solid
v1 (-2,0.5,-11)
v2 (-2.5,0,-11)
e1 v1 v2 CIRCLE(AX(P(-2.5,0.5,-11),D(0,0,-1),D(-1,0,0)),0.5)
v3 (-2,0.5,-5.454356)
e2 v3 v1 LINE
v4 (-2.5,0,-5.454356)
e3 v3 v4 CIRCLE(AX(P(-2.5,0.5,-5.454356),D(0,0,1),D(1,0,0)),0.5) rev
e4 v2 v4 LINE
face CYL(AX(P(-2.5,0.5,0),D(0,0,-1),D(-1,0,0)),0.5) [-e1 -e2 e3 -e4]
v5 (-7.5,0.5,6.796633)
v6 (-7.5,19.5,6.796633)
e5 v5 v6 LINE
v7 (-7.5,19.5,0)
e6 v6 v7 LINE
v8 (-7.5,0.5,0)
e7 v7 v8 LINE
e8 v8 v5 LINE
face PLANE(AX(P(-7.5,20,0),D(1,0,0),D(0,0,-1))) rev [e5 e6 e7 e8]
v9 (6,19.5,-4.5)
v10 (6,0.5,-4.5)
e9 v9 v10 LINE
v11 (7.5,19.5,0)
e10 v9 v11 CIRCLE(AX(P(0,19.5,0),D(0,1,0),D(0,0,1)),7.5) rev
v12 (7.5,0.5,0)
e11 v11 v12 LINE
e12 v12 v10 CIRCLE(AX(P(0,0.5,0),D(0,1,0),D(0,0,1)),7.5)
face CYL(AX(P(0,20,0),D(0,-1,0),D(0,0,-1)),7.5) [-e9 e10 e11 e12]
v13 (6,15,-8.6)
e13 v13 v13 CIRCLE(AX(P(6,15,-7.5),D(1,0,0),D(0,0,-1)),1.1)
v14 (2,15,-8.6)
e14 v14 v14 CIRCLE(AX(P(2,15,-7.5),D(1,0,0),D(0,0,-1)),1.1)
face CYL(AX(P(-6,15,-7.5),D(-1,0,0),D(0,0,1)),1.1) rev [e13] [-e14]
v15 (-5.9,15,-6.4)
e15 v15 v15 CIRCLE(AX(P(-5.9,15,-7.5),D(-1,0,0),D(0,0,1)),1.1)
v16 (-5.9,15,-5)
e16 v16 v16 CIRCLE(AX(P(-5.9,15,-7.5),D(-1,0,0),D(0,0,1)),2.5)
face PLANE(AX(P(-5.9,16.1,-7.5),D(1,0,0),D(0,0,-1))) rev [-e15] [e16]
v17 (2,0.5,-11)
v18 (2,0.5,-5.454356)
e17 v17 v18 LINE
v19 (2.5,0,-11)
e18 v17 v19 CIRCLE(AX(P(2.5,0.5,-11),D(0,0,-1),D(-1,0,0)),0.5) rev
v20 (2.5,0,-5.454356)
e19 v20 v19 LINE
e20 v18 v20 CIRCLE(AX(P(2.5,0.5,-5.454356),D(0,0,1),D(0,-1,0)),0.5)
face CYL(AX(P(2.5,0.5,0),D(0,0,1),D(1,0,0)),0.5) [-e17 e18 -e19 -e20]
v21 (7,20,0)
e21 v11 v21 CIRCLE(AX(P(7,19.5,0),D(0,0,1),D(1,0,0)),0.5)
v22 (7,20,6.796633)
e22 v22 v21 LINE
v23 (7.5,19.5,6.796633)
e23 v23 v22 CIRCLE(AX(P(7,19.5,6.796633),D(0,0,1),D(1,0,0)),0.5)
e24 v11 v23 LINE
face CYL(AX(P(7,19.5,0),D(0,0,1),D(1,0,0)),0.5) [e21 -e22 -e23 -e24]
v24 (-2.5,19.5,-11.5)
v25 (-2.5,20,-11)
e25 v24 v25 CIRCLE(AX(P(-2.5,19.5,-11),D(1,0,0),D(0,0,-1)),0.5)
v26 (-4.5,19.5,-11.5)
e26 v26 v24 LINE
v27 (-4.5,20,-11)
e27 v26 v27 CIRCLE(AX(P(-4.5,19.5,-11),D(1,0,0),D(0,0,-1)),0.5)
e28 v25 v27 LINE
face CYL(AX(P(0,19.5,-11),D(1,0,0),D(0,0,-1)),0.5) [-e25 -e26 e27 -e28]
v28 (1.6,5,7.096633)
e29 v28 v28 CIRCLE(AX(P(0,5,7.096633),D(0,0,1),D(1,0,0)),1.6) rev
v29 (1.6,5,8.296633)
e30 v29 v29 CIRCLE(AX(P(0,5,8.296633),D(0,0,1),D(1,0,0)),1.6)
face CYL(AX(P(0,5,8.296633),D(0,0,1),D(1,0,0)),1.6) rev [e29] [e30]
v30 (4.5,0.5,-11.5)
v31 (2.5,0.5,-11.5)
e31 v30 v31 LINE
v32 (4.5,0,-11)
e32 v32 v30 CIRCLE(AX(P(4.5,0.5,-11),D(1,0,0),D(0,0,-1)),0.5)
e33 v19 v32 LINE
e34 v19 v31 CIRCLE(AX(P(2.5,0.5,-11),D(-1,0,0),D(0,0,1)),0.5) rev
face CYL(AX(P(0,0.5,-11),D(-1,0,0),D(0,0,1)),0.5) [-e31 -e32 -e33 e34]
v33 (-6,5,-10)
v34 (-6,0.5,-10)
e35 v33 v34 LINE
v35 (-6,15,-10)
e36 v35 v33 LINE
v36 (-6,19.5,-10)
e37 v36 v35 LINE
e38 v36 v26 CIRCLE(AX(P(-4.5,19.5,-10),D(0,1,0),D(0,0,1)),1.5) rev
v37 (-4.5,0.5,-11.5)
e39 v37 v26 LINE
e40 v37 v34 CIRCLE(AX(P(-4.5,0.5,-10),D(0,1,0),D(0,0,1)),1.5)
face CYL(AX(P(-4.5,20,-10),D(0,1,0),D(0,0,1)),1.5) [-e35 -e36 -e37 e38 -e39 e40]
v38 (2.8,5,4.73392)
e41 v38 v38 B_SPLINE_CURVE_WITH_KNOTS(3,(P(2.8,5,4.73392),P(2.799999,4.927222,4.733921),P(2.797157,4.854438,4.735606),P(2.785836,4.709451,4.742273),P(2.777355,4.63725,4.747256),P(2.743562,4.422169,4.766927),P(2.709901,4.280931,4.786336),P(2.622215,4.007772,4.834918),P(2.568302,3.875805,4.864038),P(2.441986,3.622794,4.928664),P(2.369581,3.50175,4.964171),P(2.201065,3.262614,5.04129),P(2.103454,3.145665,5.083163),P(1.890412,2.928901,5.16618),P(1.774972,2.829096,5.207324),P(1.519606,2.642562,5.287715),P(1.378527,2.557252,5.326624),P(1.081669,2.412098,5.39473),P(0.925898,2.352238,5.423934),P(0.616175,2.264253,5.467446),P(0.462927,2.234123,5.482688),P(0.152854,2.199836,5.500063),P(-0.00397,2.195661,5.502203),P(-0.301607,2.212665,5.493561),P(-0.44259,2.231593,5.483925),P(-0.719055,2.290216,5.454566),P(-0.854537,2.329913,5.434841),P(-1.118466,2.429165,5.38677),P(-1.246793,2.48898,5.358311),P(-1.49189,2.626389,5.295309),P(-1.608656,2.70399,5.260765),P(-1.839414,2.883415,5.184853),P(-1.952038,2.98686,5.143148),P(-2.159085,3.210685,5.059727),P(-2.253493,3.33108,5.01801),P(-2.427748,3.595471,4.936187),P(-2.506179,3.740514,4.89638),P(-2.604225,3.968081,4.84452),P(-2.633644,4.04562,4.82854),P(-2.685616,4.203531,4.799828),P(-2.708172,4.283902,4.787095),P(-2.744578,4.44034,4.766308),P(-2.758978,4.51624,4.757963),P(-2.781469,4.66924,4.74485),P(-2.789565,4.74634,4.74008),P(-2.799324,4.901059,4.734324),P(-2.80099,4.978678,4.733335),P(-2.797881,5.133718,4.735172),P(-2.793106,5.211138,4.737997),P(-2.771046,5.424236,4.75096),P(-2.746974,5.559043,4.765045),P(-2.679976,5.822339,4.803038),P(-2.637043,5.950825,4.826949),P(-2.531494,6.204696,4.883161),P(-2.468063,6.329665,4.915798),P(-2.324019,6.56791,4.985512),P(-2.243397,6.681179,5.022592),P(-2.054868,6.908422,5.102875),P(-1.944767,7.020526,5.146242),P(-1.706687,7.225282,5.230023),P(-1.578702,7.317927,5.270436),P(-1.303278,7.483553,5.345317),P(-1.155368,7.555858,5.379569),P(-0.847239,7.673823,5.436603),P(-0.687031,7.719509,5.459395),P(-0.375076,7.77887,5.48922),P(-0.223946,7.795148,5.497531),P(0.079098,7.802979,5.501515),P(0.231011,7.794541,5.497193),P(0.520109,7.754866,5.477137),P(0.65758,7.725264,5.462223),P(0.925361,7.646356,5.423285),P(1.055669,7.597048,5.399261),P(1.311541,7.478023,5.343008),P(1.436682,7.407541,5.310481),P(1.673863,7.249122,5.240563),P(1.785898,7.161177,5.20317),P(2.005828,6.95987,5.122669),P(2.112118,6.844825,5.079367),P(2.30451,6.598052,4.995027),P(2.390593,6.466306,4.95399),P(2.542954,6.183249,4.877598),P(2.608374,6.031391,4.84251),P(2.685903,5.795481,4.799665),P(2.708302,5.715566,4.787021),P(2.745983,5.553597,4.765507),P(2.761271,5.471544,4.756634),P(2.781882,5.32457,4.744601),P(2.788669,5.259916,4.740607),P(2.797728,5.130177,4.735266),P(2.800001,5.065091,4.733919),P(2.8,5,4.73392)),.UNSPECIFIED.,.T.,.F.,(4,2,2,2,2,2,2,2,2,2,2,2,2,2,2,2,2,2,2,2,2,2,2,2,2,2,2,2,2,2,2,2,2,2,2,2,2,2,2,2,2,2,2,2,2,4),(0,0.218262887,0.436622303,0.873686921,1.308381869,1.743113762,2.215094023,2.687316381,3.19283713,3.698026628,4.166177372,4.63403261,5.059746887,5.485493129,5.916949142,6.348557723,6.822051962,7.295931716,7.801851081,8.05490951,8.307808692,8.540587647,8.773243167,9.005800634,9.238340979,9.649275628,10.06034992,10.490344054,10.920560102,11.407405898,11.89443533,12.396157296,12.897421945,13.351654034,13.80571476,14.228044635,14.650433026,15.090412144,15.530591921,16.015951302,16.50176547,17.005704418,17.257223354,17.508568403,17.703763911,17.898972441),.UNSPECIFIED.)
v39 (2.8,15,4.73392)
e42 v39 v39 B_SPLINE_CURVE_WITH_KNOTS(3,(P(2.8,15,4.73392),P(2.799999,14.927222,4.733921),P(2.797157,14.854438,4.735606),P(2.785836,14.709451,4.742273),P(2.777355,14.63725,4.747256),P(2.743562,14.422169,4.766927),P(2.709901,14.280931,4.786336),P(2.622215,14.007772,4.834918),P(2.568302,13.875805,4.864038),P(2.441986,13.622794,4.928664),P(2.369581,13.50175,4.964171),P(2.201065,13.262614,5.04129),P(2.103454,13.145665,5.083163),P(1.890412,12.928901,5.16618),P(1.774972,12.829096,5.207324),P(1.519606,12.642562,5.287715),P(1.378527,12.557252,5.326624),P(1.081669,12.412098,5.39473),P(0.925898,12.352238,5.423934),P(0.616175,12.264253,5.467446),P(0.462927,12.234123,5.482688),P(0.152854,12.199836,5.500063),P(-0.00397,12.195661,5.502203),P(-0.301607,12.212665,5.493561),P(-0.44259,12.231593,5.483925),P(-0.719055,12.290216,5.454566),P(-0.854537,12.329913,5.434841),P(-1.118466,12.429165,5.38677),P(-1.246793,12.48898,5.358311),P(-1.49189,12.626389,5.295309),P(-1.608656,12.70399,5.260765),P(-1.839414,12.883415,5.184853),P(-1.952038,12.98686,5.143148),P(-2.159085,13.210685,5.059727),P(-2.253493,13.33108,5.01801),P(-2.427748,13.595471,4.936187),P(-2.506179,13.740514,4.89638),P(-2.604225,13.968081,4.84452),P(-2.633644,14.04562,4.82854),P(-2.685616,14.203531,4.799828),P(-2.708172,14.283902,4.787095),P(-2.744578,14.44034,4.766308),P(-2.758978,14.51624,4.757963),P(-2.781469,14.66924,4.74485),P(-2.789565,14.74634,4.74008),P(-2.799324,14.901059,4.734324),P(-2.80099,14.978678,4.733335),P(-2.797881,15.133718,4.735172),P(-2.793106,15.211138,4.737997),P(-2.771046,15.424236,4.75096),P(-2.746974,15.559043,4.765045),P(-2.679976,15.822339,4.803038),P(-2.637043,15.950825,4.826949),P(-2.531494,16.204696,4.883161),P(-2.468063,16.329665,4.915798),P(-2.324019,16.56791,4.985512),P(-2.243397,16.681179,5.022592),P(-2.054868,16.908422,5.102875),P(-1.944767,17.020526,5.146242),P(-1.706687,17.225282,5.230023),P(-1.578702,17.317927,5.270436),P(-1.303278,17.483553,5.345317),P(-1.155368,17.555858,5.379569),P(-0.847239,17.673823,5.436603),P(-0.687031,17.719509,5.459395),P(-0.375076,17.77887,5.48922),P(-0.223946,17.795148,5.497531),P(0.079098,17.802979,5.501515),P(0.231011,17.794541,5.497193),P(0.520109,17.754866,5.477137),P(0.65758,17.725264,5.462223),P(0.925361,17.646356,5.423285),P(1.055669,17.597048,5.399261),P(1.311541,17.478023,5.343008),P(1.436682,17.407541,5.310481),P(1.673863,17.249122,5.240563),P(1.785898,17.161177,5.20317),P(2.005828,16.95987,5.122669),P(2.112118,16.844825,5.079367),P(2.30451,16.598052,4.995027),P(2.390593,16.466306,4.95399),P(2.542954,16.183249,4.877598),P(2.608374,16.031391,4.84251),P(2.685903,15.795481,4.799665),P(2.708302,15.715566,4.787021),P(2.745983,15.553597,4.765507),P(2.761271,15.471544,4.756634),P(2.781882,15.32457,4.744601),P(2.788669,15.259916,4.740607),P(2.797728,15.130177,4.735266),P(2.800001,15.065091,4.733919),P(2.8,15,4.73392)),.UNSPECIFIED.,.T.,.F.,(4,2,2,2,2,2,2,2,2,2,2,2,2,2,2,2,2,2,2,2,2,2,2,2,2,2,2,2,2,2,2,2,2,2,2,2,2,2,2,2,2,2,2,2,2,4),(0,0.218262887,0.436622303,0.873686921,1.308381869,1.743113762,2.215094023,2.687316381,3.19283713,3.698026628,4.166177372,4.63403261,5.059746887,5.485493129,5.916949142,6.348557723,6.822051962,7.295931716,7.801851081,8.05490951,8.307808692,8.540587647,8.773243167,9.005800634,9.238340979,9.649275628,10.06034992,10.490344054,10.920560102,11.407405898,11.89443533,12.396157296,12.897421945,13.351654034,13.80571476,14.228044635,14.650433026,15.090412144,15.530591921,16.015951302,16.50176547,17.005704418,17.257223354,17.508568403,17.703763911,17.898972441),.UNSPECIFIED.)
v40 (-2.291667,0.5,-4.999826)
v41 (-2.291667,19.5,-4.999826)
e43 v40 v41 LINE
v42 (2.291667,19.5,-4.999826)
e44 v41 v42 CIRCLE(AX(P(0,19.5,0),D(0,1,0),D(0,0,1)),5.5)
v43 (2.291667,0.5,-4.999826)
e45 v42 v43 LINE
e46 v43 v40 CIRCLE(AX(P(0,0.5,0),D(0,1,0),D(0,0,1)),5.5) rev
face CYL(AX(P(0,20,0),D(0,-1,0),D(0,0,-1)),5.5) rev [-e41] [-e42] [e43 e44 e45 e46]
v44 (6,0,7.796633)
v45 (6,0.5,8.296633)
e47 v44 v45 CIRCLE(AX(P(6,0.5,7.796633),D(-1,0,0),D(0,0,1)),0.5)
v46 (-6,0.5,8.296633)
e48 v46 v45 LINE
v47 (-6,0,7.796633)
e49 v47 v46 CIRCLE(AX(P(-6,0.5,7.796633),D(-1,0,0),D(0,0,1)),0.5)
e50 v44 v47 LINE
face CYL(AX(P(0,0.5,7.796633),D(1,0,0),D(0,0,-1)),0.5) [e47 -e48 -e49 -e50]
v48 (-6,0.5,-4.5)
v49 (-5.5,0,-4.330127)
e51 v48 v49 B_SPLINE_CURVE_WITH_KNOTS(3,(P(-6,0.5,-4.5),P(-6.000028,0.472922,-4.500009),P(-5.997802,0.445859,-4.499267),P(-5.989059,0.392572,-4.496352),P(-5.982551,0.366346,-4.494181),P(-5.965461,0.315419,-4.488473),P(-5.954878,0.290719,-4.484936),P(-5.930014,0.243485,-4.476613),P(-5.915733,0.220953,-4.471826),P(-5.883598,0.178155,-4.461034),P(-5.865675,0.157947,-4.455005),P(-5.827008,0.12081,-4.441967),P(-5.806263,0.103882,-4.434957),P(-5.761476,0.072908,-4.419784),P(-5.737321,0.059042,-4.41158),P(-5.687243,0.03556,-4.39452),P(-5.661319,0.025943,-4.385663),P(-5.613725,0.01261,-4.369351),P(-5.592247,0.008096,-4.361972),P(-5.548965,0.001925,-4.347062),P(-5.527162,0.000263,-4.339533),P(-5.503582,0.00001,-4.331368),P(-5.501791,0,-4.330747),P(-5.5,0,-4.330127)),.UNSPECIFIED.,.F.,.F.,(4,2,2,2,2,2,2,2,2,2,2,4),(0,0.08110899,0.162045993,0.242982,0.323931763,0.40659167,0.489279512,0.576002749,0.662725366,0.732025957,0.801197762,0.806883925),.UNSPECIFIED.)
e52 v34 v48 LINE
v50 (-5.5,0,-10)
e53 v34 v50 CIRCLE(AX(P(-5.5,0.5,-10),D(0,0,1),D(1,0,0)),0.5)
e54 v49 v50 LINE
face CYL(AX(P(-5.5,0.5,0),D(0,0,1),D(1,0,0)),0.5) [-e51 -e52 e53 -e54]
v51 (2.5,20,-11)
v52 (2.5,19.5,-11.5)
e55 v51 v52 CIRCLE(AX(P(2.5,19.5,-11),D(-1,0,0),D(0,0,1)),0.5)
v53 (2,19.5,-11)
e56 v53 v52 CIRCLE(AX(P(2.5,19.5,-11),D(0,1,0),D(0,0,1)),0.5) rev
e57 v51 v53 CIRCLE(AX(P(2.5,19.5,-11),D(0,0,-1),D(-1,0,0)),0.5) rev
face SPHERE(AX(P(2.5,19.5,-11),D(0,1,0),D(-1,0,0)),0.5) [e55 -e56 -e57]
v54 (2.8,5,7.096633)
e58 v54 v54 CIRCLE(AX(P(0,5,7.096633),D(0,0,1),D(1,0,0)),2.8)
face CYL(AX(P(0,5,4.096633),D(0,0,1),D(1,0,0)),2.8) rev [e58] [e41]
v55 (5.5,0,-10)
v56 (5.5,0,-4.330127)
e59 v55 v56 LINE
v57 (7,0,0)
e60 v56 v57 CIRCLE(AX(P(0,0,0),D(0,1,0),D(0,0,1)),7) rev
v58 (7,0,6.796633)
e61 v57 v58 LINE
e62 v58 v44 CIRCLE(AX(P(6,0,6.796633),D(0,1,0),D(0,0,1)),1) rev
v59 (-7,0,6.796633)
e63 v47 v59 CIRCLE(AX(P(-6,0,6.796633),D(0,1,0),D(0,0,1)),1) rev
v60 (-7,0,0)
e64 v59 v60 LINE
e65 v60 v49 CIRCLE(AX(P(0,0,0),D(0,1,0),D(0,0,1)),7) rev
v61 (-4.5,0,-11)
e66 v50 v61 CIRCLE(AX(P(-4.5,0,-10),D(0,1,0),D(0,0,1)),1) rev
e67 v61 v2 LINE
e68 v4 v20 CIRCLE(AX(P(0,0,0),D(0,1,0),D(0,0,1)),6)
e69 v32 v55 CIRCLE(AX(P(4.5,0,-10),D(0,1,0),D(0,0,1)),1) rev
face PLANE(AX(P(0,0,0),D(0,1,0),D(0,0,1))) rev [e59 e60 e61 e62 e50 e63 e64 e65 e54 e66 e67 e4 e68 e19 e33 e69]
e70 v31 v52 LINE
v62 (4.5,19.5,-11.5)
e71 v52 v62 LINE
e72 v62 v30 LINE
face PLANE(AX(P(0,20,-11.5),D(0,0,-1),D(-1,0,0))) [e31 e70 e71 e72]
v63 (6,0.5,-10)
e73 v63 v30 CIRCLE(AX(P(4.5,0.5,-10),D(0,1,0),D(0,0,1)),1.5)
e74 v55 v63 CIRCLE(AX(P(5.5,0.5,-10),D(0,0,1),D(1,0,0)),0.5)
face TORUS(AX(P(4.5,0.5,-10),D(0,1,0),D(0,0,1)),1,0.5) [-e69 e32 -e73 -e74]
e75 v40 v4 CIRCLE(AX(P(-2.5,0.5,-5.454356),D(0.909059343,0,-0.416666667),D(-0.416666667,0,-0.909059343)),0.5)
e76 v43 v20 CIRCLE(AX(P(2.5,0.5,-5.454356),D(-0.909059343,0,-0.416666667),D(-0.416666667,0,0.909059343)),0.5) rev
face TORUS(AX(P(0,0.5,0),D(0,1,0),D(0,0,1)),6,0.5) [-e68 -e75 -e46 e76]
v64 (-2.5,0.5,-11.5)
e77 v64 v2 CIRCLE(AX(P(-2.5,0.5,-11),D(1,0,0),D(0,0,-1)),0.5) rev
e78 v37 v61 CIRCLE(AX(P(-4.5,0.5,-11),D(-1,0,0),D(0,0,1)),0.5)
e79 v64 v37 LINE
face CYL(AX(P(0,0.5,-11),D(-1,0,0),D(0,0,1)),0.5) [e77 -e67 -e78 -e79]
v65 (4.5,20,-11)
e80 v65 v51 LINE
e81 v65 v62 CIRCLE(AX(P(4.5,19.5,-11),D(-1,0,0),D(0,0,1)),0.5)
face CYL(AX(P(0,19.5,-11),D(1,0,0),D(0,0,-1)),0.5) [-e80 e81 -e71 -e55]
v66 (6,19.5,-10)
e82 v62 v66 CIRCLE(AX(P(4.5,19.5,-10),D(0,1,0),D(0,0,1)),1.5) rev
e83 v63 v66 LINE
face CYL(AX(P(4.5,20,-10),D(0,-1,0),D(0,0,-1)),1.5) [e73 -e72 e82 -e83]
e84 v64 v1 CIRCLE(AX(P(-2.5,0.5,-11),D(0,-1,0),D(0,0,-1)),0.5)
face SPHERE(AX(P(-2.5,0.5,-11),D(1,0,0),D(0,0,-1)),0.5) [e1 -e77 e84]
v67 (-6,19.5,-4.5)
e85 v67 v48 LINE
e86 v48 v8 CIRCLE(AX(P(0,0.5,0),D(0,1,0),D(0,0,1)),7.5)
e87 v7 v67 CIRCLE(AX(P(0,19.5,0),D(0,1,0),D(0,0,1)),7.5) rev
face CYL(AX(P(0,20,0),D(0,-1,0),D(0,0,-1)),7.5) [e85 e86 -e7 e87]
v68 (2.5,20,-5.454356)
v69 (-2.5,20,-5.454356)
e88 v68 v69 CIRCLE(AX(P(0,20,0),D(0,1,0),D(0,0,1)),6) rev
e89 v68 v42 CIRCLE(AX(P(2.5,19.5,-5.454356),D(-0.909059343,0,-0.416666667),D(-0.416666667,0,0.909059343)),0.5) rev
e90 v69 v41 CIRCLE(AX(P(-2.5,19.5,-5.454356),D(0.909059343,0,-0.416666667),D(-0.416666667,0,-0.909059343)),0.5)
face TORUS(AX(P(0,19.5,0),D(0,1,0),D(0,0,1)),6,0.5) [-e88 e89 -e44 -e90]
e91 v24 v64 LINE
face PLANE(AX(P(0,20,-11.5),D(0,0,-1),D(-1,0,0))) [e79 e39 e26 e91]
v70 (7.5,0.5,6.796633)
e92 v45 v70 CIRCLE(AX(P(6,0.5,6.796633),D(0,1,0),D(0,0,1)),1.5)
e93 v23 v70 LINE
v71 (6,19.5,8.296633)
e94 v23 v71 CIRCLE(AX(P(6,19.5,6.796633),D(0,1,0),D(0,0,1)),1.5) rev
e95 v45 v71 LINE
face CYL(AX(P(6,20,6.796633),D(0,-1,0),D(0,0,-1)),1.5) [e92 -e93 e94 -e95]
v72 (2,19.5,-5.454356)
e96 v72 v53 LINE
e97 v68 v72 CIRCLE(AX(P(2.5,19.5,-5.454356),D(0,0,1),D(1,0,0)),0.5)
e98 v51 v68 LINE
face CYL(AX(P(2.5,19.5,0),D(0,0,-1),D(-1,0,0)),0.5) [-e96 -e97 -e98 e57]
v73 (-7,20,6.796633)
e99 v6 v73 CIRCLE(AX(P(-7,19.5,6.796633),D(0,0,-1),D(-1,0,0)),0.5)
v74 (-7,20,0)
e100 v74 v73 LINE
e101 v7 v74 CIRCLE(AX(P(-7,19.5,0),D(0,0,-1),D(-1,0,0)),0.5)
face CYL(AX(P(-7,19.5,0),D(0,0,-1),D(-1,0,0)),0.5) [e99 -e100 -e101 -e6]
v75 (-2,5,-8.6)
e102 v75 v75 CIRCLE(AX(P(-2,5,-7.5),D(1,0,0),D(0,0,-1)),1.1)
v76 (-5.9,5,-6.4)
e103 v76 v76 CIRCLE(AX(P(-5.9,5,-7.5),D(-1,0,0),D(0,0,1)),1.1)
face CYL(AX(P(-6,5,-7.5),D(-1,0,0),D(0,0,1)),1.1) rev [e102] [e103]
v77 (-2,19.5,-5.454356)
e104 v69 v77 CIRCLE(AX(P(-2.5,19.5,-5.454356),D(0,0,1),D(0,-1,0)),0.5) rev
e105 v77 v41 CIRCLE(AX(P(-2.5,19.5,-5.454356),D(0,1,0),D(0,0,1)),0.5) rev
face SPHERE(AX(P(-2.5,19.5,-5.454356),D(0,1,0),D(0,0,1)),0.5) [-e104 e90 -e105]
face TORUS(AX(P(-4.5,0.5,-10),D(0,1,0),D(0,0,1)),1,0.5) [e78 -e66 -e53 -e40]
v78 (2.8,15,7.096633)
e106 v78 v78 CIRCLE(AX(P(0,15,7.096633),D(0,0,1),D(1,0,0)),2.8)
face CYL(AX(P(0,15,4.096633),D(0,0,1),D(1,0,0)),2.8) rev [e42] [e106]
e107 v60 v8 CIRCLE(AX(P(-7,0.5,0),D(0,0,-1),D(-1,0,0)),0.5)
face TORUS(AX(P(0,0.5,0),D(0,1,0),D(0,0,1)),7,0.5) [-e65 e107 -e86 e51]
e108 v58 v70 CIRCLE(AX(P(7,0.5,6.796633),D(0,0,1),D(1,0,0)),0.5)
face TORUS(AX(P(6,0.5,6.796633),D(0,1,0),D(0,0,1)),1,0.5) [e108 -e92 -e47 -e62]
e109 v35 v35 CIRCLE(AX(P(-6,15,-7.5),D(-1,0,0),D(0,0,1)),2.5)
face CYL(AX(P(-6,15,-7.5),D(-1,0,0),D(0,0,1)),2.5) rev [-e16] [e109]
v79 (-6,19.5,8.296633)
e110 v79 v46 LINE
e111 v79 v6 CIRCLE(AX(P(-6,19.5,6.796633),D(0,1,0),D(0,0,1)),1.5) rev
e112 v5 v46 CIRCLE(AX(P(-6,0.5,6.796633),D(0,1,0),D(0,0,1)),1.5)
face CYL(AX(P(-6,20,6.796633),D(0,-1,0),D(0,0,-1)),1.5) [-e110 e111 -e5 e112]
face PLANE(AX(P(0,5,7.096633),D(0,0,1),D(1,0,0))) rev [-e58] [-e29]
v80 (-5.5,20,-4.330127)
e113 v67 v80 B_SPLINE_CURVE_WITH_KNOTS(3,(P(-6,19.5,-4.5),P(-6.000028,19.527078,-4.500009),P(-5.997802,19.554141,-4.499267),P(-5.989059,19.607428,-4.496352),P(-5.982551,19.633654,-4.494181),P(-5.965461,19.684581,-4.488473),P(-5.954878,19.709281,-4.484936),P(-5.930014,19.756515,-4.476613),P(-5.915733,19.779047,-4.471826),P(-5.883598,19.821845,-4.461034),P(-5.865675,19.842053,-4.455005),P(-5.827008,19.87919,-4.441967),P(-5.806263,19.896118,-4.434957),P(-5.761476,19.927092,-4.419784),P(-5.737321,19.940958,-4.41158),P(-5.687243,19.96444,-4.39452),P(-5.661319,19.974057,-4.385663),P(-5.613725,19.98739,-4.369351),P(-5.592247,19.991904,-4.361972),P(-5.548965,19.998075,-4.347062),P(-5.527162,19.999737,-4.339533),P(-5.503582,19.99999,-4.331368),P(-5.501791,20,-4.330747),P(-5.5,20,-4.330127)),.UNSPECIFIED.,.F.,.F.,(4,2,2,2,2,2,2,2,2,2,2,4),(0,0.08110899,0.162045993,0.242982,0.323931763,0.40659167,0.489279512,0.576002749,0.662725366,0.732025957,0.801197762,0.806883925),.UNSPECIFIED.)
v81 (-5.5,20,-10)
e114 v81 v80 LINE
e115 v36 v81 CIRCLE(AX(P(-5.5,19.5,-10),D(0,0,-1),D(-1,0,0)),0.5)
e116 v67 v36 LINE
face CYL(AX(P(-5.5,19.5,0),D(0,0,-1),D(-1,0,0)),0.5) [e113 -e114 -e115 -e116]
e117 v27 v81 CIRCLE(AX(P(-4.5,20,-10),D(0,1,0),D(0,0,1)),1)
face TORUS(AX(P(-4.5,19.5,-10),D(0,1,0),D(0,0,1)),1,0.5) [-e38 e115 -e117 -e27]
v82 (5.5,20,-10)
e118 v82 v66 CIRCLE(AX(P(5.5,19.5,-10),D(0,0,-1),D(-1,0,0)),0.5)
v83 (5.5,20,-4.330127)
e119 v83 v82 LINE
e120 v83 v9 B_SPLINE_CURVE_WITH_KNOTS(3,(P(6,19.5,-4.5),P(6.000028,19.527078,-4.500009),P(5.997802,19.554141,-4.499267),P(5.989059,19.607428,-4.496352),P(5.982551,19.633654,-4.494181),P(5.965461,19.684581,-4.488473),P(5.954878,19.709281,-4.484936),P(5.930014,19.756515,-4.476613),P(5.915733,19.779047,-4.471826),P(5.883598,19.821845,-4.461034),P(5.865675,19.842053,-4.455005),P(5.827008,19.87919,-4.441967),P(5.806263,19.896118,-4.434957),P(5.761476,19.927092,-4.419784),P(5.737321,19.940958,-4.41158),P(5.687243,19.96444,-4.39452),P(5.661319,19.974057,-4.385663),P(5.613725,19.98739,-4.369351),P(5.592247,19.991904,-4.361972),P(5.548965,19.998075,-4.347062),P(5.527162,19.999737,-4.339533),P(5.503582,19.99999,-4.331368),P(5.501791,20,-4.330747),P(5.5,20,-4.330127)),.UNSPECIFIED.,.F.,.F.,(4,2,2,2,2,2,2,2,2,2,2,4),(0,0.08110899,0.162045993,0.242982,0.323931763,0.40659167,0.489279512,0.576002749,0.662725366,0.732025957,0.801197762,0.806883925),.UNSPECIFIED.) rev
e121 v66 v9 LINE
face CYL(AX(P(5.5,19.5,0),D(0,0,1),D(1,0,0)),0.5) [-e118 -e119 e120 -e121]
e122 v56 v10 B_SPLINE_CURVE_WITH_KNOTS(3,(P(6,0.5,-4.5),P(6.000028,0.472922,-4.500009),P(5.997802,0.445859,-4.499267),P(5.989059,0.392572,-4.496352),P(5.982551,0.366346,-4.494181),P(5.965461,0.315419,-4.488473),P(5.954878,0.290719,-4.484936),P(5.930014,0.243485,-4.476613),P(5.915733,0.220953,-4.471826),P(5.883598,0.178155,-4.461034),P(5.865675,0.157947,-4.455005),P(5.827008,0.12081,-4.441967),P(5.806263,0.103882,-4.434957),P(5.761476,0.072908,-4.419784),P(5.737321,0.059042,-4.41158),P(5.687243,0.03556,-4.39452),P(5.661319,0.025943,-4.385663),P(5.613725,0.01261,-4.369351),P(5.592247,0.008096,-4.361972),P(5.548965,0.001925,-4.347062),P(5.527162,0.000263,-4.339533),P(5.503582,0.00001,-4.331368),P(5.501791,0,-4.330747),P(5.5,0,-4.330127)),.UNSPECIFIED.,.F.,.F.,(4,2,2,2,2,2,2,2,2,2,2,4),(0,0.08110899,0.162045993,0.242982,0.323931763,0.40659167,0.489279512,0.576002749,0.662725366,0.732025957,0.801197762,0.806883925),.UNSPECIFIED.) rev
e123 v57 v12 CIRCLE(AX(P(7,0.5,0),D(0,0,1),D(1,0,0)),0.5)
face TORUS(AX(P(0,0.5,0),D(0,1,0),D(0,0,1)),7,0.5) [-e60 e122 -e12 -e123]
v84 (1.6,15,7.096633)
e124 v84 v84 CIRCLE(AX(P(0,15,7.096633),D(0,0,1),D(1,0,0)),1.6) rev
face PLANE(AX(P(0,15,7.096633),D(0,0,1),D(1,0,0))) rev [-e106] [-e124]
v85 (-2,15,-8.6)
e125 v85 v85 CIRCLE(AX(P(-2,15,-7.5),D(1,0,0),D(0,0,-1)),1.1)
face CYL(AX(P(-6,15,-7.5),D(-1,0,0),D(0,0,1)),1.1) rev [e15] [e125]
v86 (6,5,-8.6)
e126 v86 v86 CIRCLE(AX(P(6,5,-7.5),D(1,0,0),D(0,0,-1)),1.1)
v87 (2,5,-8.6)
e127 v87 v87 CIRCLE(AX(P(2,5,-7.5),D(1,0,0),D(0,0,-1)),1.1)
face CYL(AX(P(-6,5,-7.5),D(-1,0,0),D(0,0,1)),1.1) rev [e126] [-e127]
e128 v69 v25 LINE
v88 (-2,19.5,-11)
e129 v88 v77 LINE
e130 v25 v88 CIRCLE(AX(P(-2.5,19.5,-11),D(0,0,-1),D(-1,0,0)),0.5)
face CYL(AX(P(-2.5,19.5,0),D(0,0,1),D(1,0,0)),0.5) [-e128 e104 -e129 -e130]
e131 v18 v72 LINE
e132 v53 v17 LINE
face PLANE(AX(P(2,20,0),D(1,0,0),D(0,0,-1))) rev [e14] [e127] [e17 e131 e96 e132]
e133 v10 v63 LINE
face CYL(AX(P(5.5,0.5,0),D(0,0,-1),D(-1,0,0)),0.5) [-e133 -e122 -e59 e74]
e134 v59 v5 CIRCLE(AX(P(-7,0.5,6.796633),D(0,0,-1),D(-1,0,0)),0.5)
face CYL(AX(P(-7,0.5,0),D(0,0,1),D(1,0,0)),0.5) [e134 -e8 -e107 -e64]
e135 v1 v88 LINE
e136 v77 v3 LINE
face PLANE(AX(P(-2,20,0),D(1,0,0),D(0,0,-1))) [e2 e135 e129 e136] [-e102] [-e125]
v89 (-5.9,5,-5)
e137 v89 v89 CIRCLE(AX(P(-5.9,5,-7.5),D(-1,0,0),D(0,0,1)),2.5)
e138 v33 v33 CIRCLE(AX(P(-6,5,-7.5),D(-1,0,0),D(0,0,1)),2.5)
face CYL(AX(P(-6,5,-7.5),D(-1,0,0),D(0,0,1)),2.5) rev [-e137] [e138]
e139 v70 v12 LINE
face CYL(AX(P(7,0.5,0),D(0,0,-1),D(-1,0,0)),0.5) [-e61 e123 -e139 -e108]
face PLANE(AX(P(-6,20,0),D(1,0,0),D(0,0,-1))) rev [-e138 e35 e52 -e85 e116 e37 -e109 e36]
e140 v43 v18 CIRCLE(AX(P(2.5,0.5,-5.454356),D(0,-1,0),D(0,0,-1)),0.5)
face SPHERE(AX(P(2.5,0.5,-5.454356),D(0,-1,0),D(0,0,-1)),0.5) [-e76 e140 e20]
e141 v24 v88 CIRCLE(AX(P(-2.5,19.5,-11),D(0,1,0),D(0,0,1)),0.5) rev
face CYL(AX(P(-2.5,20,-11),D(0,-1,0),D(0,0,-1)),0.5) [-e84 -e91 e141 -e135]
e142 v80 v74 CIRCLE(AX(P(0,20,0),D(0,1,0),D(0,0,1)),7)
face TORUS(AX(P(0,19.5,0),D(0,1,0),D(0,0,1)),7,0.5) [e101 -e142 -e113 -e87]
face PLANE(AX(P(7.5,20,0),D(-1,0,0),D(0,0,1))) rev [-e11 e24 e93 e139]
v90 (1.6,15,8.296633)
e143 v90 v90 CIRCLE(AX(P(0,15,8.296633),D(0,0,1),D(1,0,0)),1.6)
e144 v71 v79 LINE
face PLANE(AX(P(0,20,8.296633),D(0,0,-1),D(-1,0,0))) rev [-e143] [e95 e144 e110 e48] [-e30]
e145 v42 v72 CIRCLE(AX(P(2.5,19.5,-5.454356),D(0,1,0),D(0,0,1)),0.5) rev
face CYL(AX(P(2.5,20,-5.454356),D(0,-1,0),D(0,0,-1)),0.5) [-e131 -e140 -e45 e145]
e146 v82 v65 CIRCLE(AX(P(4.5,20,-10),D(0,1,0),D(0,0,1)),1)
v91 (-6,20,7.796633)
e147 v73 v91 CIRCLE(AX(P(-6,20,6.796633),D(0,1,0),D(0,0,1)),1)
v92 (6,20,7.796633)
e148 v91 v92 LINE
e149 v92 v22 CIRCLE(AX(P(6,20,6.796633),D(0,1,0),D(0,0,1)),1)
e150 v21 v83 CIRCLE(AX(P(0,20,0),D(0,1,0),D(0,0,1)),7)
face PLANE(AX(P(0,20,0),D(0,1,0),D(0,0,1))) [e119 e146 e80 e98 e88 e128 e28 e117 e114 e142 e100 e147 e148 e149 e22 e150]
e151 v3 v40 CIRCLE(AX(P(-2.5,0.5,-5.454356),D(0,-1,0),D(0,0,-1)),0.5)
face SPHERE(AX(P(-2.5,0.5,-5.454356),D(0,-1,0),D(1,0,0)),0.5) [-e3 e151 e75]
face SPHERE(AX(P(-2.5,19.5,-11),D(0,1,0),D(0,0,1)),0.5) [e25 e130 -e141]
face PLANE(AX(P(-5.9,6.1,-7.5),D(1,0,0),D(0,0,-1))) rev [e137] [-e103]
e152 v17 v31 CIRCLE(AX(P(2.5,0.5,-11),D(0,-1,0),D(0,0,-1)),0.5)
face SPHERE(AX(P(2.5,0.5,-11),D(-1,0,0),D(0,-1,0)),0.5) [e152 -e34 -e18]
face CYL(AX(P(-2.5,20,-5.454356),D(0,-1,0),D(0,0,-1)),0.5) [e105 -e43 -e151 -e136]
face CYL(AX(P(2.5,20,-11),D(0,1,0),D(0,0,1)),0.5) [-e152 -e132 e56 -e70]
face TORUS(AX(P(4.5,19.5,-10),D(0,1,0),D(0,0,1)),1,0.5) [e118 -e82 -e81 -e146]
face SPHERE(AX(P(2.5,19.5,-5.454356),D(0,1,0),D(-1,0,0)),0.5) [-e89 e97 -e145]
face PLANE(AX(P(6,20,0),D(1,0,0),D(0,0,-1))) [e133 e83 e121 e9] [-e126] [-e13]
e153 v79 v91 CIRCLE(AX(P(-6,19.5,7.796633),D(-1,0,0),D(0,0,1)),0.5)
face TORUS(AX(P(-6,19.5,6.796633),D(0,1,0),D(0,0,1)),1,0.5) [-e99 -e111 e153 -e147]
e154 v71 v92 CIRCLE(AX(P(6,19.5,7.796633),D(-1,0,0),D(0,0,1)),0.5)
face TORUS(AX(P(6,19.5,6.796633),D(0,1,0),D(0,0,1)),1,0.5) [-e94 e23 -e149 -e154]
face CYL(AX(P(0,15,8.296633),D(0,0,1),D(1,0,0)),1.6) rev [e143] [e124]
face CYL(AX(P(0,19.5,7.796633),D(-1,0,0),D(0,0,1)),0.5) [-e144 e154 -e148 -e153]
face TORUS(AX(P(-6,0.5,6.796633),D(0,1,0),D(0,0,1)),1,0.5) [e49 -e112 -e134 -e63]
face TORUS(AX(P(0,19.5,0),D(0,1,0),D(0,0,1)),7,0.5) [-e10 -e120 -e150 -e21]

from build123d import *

# Parameters (mm, degrees)
BOSS_EXTRUDE1_DEPTH                          = 20
M3_START                                     = 5.262128746
M3_CLEARANCE_HOLE1_OUTLINE_R                 = 1.6
M3_CLEARANCE_HOLE1_DEPTH                     = 3.034503848
CBORE_START                                  = -6
CBORE_FOR_M2_PAN_HEAD_MACHINE_SCREW6_OUT_R   = 1.1
CBORE_FOR_M2_PAN_HEAD_MACHINE_SCREW6_DEPTH   = 12
CBORE_FOR_M2_PAN_HEAD_MACHINE_SCREW6_2_O_R   = 2.5
CBORE_FOR_M2_PAN_HEAD_MACHINE_SCREW6_2_O_R_2 = 1.1
CBORE_FOR_M2_PAN_HEAD_MACHINE_SCREW6_2_DEPTH = 0.1
CUT_EXTRUDE4_START                           = -1.2
SKETCH10_R                                   = 2.8
CUT_EXTRUDE4_DEPTH                           = 3
FILLET2_R                                    = 1.5
FILLET3_R                                    = 0.5


# Read off the part's stored shape, not the designer's step: M3 Clearance Hole1, CBORE for M2 Pan Head Machine Screw6
with BuildPart() as part:
    # Sketch2 → Boss-Extrude1 (new body)
    with BuildSketch(Plane(origin=(0, 0, 0), x_dir=(1, 0, 0), z_dir=(0, 1, 0))):
        with BuildLine():
            Line((-2, 11.5), (-6, 11.5))
            Line((-6, 11.5), (-6, 4.5))
            ThreePointArc((-6, 4.5), (-4.226235165, 6.195880594), (-2, 7.228416147))
            Line((-2, 7.228416147), (-2, 11.5))
        make_face()
        with BuildLine():
            Line((6, 11.5), (2, 11.5))
            Line((2, 11.5), (2, 7.228416147))
            ThreePointArc((2, 7.228416147), (4.226235165, 6.195880594), (6, 4.5))
            Line((6, 4.5), (6, 11.5))
        make_face()
        with BuildLine():
            ThreePointArc((6, 4.5), (4.226235165, 6.195880594), (2, 7.228416147))
            Line((2, 7.228416147), (2, 5.123475383))
            ThreePointArc((2, 5.123475383), (3.335664101, 4.373024698), (4.412505498, 3.283259849))
            Line((4.412505498, 3.283259849), (6, 3.283259849))
            Line((6, 3.283259849), (6, 4.5))
        make_face()
        with BuildLine():
            Line((-6, 3.283259849), (-6, 4.5))
            ThreePointArc((-6, 4.5), (-7.115124735, 2.371708245), (-7.5, 0))
            ThreePointArc((-7.5, 0), (0, -7.5), (7.5, 0))
            ThreePointArc((7.5, 0), (7.115124735, 2.371708245), (6, 4.5))
            Line((6, 4.5), (6, 3.283259849))
            Line((6, 3.283259849), (4.412505498, 3.283259849))
            ThreePointArc((4.412505498, 3.283259849), (5.221052587, 1.729337989), (5.5, 0))
            ThreePointArc((5.5, 0), (-1.729337989, -5.221052587), (-4.412505498, 3.283259849))
            Line((-4.412505498, 3.283259849), (-6, 3.283259849))
        make_face()
        with BuildLine():
            ThreePointArc((7.5, 0), (0, -7.5), (-7.5, 0))
            Line((-7.5, 0), (-7.5, -8.296632594))
            Line((-7.5, -8.296632594), (7.5, -8.296632594))
            Line((7.5, -8.296632594), (7.5, 0))
        make_face()
        with BuildLine():
            ThreePointArc((-2, 7.228416147), (-4.226235165, 6.195880594), (-6, 4.5))
            Line((-6, 4.5), (-6, 3.283259849))
            Line((-6, 3.283259849), (-4.412505498, 3.283259849))
            ThreePointArc((-4.412505498, 3.283259849), (-3.335664101, 4.373024698), (-2, 5.123475383))
            Line((-2, 5.123475383), (-2, 7.228416147))
        make_face()
    extrude(amount=BOSS_EXTRUDE1_DEPTH)

    # M3 Clearance Hole1 outline → M3 Clearance Hole1 (cut)
    with BuildSketch(Plane.XY.offset(M3_START)):
        with Locations((0, 5)):
            Circle(M3_CLEARANCE_HOLE1_OUTLINE_R)
        with Locations((0, 15)):
            Circle(M3_CLEARANCE_HOLE1_OUTLINE_R)
    extrude(amount=M3_CLEARANCE_HOLE1_DEPTH, mode=Mode.SUBTRACT)

    # CBORE for M2 Pan Head Machine Screw6 out → CBORE for M2 Pan Head Machine Screw6 (cut)
    with BuildSketch(Plane.YZ.offset(CBORE_START)):
        with Locations((5, -7.5)):
            Circle(CBORE_FOR_M2_PAN_HEAD_MACHINE_SCREW6_OUT_R)
        with Locations((15, -7.5)):
            Circle(CBORE_FOR_M2_PAN_HEAD_MACHINE_SCREW6_OUT_R)
    extrude(amount=CBORE_FOR_M2_PAN_HEAD_MACHINE_SCREW6_DEPTH, mode=Mode.SUBTRACT)

    # CBORE for M2 Pan Head Machine Screw6 2 o → CBORE for M2 Pan Head Machine Screw6 2 (cut)
    # profile 1 of 2: a face of its own
    with BuildSketch(Plane.YZ.offset(CBORE_START)):
        with Locations((5, -7.5)):
            Circle(CBORE_FOR_M2_PAN_HEAD_MACHINE_SCREW6_2_O_R)
        with Locations((5, -7.5)):
            Circle(CBORE_FOR_M2_PAN_HEAD_MACHINE_SCREW6_2_O_R_2, mode=Mode.SUBTRACT)
    # profile 2 of 2: a face of its own
    with BuildSketch(Plane.YZ.offset(CBORE_START)):
        with Locations((15, -7.5)):
            Circle(CBORE_FOR_M2_PAN_HEAD_MACHINE_SCREW6_2_O_R)
        with Locations((15, -7.5)):
            Circle(CBORE_FOR_M2_PAN_HEAD_MACHINE_SCREW6_2_O_R_2, mode=Mode.SUBTRACT)
    extrude(amount=CBORE_FOR_M2_PAN_HEAD_MACHINE_SCREW6_2_DEPTH, mode=Mode.SUBTRACT)

    # Sketch10 → Cut-Extrude4 (cut)
    with BuildSketch(Plane.XY.offset(8.296632594).offset(CUT_EXTRUDE4_START)):
        with Locations((0, 15)):
            Circle(SKETCH10_R)
        with Locations((0, 5)):
            Circle(SKETCH10_R)
    extrude(amount=-CUT_EXTRUDE4_DEPTH, mode=Mode.SUBTRACT)

    # Fillet2
    fillet2_edges = [part.edges().sort_by_distance(p)[0] for p in [
        (-6, 10, -11.5),
        (6, 10, -11.5),
        (7.5, 10, 8.296632594),
        (-7.5, 10, 8.296632594),
    ]]
    fillet(fillet2_edges, radius=FILLET2_R - 0.0001)  # a hair under: the kernel refuses the full size

    # Fillet3
    fillet3_edges = [part.edges().sort_by_distance(p)[0] for p in [
        (0, 0, 8.296632594),
        (-7.060689461, 0, 7.857322055),
        (7.060689461, 0, 7.857322055),
        (5.560689461, 0, -11.060689461),
        (-5.560689461, 0, -11.060689461),
        (-3.25005, 20, -11.5),
        (0, 20, 8.296632594),
        (7.5, 20, 3.398366297),
        (6, 20, -7.25005),
        (-7.060689461, 20, 7.857322055),
        (-7.115124735, 20, -2.371708245),
        (7.060689461, 20, 7.857322055),
        (5.560689461, 20, -11.060689461),
        (-5.560689461, 20, -11.060689461),
        (-2, 0, -8.311737691),
        (1.517117002, 0, 5.286620471),
        (-7.5, 20, 3.398366297),
        (2, 0, -8.311737691),
        (3.25005, 0, -11.5),
        (7.115124735, 0, -2.371708245),
        (-7.5, 0, 3.398366297),
        (-7.115124735, 0, -2.371708245),
        (-2, 10, -11.5),
        (-2, 10, -5.123475383),
        (2, 10, -5.123475383),
        (2, 10, -11.5),
        (7.115124735, 20, -2.371708245),
        (3.25005, 20, -11.5),
        (2, 20, -8.311737691),
        (1.517117002, 20, 5.286620471),
        (-2, 20, -8.311737691),
        (-6, 0, -7.25005),
        (-6, 20, -7.25005),
        (-3.25005, 0, -11.5),
        (6, 0, -7.25005),
        (7.5, 0, 3.398366297),
    ]]
    fillet(fillet3_edges, radius=FILLET3_R)


solid = part.part
